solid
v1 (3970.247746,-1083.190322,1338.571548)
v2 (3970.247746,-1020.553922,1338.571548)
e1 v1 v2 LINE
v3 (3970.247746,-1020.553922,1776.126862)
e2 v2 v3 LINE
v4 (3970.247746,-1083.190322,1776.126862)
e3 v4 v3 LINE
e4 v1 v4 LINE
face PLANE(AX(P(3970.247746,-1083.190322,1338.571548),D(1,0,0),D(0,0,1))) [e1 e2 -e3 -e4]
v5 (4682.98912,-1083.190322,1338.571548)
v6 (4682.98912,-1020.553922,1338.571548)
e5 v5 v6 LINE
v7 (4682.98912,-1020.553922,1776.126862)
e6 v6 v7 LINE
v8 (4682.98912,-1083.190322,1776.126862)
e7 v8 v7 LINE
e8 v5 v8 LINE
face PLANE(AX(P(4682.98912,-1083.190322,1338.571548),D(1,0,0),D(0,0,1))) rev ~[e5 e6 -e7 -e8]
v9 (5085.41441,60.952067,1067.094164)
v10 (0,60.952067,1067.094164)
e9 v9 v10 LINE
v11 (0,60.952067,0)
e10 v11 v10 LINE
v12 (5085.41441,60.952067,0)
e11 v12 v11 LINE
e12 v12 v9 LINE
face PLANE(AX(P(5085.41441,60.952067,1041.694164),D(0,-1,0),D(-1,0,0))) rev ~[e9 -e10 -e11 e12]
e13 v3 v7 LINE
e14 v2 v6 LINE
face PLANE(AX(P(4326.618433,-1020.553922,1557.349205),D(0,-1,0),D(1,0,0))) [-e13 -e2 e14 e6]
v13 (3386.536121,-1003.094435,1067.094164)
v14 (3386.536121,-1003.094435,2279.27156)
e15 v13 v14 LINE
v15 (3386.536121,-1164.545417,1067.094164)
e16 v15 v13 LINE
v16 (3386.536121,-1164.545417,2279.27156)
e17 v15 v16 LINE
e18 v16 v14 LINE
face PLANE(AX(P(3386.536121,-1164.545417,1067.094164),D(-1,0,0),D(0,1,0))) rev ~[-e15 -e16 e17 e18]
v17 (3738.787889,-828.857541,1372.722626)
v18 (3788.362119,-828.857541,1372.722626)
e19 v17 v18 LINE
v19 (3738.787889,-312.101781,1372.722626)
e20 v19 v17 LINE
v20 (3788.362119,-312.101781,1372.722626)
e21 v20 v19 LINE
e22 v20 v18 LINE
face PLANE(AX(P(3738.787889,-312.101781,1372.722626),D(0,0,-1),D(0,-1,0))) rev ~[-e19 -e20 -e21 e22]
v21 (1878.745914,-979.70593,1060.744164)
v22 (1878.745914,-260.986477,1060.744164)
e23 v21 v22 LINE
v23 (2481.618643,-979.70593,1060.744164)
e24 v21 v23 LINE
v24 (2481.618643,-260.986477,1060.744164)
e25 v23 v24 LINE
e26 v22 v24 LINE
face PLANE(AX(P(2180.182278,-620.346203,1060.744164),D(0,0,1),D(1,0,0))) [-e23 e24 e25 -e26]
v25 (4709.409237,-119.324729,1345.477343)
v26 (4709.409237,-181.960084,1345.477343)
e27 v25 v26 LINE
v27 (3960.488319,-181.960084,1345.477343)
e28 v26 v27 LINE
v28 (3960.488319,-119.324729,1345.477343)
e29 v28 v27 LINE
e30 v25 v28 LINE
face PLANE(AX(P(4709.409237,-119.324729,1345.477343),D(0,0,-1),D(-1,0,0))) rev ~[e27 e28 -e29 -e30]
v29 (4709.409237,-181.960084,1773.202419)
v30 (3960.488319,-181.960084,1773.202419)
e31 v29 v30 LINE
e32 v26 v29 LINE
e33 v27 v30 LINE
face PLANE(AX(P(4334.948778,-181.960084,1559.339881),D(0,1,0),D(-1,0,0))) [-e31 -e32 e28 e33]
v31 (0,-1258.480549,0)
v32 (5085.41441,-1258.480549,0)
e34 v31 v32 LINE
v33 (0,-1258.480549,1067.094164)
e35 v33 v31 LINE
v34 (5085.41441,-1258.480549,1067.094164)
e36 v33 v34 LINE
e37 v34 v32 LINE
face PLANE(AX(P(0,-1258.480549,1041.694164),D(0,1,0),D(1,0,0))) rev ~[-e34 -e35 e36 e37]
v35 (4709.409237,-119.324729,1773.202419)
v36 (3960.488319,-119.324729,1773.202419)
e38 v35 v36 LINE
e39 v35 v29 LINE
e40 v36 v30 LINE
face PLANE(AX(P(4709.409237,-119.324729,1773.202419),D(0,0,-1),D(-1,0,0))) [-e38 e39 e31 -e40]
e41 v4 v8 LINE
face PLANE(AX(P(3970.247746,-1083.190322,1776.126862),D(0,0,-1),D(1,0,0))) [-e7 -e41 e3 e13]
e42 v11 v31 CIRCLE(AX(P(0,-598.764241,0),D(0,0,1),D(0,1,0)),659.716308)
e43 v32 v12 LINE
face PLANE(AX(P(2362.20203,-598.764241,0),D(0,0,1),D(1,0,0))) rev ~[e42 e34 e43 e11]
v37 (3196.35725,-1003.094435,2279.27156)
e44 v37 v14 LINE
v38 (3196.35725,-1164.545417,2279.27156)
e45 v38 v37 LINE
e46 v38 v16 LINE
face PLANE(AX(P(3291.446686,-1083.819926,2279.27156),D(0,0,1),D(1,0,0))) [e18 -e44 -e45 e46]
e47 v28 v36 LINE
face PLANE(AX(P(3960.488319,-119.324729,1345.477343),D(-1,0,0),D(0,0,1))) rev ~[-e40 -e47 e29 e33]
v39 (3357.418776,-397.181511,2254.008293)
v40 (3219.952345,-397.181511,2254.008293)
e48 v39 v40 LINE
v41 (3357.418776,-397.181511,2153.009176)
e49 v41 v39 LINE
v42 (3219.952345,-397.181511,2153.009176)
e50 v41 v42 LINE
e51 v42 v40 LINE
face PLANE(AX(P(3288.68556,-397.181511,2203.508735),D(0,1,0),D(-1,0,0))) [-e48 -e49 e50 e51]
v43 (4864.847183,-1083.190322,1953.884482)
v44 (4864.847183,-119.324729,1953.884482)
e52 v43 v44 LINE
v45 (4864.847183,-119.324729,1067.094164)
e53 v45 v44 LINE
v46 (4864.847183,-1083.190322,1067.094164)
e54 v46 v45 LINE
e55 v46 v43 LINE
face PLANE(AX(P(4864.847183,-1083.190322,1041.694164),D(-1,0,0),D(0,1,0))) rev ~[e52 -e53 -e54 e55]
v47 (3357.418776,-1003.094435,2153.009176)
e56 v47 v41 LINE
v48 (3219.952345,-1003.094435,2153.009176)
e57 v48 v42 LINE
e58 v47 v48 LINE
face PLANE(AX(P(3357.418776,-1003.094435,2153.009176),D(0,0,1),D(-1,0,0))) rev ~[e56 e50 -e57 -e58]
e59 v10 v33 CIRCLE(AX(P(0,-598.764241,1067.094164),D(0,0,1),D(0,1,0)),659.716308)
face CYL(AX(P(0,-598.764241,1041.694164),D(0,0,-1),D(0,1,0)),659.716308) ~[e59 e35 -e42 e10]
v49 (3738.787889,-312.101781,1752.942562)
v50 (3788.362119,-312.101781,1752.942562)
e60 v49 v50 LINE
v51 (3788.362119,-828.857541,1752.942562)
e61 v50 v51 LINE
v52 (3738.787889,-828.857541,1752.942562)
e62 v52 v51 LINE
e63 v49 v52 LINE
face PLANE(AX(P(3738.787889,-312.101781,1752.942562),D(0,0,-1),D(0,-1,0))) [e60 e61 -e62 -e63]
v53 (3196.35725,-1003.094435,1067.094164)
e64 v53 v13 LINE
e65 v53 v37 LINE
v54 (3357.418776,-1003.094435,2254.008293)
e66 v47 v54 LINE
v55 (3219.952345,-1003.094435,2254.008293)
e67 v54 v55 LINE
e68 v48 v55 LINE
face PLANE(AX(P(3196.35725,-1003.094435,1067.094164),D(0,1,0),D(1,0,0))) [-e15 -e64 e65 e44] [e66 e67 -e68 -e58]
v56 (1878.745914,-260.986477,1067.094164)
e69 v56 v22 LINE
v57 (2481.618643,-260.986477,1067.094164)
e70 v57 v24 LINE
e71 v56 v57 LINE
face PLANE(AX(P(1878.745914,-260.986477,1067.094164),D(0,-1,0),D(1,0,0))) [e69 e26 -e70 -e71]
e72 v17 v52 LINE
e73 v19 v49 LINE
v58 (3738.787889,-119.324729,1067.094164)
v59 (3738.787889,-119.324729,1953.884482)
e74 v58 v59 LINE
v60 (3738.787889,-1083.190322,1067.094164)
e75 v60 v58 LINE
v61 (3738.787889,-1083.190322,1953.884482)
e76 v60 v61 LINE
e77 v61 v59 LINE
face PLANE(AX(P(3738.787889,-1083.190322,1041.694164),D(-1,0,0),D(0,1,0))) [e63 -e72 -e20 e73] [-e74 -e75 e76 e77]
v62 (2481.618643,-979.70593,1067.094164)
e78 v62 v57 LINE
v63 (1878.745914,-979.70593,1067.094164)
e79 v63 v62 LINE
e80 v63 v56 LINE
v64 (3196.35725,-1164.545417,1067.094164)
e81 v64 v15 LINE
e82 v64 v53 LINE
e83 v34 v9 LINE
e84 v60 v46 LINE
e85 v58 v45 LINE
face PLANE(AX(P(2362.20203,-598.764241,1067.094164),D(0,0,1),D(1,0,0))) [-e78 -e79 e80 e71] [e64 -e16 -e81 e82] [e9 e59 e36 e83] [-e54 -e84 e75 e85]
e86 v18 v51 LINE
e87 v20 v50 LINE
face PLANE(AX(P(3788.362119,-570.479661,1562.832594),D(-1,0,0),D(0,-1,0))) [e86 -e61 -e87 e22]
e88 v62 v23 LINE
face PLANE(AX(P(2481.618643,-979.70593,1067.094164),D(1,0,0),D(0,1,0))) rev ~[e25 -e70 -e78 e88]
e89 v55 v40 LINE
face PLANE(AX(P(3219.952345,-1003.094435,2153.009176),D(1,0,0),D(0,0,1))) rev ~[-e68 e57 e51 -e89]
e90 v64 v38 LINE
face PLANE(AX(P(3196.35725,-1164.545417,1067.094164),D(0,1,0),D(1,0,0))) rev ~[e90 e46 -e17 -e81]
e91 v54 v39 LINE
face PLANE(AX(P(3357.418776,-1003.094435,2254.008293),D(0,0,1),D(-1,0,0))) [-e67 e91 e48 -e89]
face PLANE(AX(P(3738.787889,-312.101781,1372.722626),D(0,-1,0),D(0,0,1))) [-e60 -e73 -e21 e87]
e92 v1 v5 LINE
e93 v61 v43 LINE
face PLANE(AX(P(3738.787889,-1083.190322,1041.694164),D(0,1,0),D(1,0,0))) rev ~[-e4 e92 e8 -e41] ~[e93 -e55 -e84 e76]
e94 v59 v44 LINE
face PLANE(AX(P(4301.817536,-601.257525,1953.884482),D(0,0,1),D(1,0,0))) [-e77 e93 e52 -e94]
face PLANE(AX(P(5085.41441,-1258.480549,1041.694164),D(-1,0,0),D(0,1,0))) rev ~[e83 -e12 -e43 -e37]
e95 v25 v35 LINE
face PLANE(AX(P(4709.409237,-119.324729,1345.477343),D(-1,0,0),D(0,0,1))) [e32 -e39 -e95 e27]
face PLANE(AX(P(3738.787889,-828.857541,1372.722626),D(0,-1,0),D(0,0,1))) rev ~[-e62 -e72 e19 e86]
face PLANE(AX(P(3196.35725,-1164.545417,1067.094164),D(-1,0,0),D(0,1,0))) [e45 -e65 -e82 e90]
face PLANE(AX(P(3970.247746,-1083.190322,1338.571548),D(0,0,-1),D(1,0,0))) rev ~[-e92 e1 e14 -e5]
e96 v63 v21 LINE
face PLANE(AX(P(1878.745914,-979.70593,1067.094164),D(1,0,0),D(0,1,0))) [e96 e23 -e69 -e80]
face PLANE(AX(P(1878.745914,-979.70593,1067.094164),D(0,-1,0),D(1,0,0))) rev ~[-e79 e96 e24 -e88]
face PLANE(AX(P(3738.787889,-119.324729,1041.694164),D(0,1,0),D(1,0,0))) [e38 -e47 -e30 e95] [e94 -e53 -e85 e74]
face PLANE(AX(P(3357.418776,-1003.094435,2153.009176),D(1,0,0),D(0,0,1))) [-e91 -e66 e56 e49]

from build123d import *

# Parameters (mm, degrees)
F1_DEPTH  = 1041.6941642761
F2_W      = 1126.0592937469
F2_H      = 963.8655930758
F3_DEPTH  = 912.1903181076
F4_W      = 1126.0592937469
F4_H      = 963.8655930758
F5_DEPTH  = 25.4
F7_W      = 516.755759716
F7_H      = 380.2199363708
F8_DEPTH  = 0.79375
F9_DEPTH  = 49.5742298663
F10_W     = 748.920917511
F10_H     = 427.7250766754
F11_DEPTH = 62.6353546977
F12_W     = 712.7413749695
F12_H     = 437.5553131104
F13_DEPTH = 62.6364
F14_W     = 602.8727293015
F14_H     = 718.7194526196
F15_DEPTH = 6.35
F16_W     = 190.1788711548
F16_H     = 161.4509820938
F17_DEPTH = 1212.1773958206
F18_W     = 137.4664306641
F18_H     = 100.9991168976
F19_DEPTH = 605.9129238129


# Not quite as in the source:
# - a length typed as a fraction of an inch, garbled in the dataset ("3 / 203.2 mm" for 3/8 in), is restored


with BuildPart() as f1:
    # F0 (on Top) → F1 (new body)
    with BuildSketch(Plane.XY):
        with BuildLine():
            Line((1275.3586769104, 60.9520673752), (0, 60.9520673752))
            ThreePointArc((0, 60.9520673752), (-659.7163081169, -598.7642407417), (0, -1258.4805488586))
            Line((0, -1258.4805488586), (5085.4144096375, -1258.4805488586))
            Line((5085.4144096375, -1258.4805488586), (5085.4144096375, 60.9520673752))
            Line((5085.4144096375, 60.9520673752), (1275.3586769104, 60.9520673752))
        make_face()
    extrude(amount=F1_DEPTH)

    # F2 (on face) → F3 (join)
    with BuildSketch(Plane.XY.offset(1041.6941642761)):
        with Locations((4301.8175363541, -601.2575253844)):
            Rectangle(F2_W, F2_H)
    extrude(amount=F3_DEPTH)

    # F4 (on face) → F5 (join)
    with BuildSketch(Plane.XY.offset(1041.6941642761)):
        with BuildLine():
            Line((5085.4144096375, -1258.4805488586), (5085.4144096375, 60.9520673752))
            Line((5085.4144096375, 60.9520673752), (0, 60.9520673752))
            ThreePointArc((0, 60.9520673752), (-659.7163081169, -598.7642407417), (0, -1258.4805488586))
            Line((0, -1258.4805488586), (5085.4144096375, -1258.4805488586))
        make_face()
        with Locations((4301.8175363541, -601.2575253844)):
            Rectangle(F4_W, F4_H, mode=Mode.SUBTRACT)
    extrude(amount=F5_DEPTH)

    # F7 (on face) → F8 (cut)
    with BuildSketch(Plane(origin=(3738.7878894806, 0, 0), x_dir=(0, -1, 0), z_dir=(-1, 0, 0))):
        with Locations((570.4796612263, 1562.8325939178)):
            Rectangle(F7_W, F7_H)
    extrude(amount=-F8_DEPTH, mode=Mode.SUBTRACT)

    # F7 (on face) → F9 (cut)
    with BuildSketch(Plane(origin=(3738.7878894806, 0, 0), x_dir=(0, -1, 0), z_dir=(-1, 0, 0))):
        with Locations((570.4796612263, 1562.8325939178)):
            Rectangle(F7_W, F7_H)
    extrude(amount=-F9_DEPTH, mode=Mode.SUBTRACT)

    # F10 (on face) → F11 (cut)
    with BuildSketch(Plane(origin=(0, -119.3247288465, 0), x_dir=(-1, 0, 0), z_dir=(0, 1, 0))):
        with Locations((-4334.9487781525, 1559.3398809433)):
            Rectangle(F10_W, F10_H)
    extrude(amount=-F11_DEPTH, mode=Mode.SUBTRACT)

    # F12 (on face) → F13 (cut)
    with BuildSketch(Plane.XZ.offset(1083.1903219223)):
        with Locations((4326.6184329987, 1557.3492050171)):
            Rectangle(F12_W, F12_H)
    extrude(amount=-F13_DEPTH, mode=Mode.SUBTRACT)

    # F14 (on face) → F15 (cut)
    with BuildSketch(Plane.XY.offset(1067.0941642761)):
        with Locations((2180.1822781563, -620.3462034464)):
            Rectangle(F14_W, F14_H)
    extrude(amount=-F15_DEPTH, mode=Mode.SUBTRACT)

    # F16 (on face) → F17 (join)
    with BuildSketch(Plane.XY.offset(1067.0941642761)):
        with Locations((3291.446685791, -1083.8199257851)):
            Rectangle(F16_W, F16_H)
    extrude(amount=F17_DEPTH)

    # F18 (on face) → F19 (join)
    with BuildSketch(Plane(origin=(0, -1003.0944347382, 0), x_dir=(-1, 0, 0), z_dir=(0, 1, 0))):
        with Locations((-3288.6855602264, 2203.5087347031)):
            Rectangle(F18_W, F18_H)
    extrude(amount=F19_DEPTH)


solid = f1.part
